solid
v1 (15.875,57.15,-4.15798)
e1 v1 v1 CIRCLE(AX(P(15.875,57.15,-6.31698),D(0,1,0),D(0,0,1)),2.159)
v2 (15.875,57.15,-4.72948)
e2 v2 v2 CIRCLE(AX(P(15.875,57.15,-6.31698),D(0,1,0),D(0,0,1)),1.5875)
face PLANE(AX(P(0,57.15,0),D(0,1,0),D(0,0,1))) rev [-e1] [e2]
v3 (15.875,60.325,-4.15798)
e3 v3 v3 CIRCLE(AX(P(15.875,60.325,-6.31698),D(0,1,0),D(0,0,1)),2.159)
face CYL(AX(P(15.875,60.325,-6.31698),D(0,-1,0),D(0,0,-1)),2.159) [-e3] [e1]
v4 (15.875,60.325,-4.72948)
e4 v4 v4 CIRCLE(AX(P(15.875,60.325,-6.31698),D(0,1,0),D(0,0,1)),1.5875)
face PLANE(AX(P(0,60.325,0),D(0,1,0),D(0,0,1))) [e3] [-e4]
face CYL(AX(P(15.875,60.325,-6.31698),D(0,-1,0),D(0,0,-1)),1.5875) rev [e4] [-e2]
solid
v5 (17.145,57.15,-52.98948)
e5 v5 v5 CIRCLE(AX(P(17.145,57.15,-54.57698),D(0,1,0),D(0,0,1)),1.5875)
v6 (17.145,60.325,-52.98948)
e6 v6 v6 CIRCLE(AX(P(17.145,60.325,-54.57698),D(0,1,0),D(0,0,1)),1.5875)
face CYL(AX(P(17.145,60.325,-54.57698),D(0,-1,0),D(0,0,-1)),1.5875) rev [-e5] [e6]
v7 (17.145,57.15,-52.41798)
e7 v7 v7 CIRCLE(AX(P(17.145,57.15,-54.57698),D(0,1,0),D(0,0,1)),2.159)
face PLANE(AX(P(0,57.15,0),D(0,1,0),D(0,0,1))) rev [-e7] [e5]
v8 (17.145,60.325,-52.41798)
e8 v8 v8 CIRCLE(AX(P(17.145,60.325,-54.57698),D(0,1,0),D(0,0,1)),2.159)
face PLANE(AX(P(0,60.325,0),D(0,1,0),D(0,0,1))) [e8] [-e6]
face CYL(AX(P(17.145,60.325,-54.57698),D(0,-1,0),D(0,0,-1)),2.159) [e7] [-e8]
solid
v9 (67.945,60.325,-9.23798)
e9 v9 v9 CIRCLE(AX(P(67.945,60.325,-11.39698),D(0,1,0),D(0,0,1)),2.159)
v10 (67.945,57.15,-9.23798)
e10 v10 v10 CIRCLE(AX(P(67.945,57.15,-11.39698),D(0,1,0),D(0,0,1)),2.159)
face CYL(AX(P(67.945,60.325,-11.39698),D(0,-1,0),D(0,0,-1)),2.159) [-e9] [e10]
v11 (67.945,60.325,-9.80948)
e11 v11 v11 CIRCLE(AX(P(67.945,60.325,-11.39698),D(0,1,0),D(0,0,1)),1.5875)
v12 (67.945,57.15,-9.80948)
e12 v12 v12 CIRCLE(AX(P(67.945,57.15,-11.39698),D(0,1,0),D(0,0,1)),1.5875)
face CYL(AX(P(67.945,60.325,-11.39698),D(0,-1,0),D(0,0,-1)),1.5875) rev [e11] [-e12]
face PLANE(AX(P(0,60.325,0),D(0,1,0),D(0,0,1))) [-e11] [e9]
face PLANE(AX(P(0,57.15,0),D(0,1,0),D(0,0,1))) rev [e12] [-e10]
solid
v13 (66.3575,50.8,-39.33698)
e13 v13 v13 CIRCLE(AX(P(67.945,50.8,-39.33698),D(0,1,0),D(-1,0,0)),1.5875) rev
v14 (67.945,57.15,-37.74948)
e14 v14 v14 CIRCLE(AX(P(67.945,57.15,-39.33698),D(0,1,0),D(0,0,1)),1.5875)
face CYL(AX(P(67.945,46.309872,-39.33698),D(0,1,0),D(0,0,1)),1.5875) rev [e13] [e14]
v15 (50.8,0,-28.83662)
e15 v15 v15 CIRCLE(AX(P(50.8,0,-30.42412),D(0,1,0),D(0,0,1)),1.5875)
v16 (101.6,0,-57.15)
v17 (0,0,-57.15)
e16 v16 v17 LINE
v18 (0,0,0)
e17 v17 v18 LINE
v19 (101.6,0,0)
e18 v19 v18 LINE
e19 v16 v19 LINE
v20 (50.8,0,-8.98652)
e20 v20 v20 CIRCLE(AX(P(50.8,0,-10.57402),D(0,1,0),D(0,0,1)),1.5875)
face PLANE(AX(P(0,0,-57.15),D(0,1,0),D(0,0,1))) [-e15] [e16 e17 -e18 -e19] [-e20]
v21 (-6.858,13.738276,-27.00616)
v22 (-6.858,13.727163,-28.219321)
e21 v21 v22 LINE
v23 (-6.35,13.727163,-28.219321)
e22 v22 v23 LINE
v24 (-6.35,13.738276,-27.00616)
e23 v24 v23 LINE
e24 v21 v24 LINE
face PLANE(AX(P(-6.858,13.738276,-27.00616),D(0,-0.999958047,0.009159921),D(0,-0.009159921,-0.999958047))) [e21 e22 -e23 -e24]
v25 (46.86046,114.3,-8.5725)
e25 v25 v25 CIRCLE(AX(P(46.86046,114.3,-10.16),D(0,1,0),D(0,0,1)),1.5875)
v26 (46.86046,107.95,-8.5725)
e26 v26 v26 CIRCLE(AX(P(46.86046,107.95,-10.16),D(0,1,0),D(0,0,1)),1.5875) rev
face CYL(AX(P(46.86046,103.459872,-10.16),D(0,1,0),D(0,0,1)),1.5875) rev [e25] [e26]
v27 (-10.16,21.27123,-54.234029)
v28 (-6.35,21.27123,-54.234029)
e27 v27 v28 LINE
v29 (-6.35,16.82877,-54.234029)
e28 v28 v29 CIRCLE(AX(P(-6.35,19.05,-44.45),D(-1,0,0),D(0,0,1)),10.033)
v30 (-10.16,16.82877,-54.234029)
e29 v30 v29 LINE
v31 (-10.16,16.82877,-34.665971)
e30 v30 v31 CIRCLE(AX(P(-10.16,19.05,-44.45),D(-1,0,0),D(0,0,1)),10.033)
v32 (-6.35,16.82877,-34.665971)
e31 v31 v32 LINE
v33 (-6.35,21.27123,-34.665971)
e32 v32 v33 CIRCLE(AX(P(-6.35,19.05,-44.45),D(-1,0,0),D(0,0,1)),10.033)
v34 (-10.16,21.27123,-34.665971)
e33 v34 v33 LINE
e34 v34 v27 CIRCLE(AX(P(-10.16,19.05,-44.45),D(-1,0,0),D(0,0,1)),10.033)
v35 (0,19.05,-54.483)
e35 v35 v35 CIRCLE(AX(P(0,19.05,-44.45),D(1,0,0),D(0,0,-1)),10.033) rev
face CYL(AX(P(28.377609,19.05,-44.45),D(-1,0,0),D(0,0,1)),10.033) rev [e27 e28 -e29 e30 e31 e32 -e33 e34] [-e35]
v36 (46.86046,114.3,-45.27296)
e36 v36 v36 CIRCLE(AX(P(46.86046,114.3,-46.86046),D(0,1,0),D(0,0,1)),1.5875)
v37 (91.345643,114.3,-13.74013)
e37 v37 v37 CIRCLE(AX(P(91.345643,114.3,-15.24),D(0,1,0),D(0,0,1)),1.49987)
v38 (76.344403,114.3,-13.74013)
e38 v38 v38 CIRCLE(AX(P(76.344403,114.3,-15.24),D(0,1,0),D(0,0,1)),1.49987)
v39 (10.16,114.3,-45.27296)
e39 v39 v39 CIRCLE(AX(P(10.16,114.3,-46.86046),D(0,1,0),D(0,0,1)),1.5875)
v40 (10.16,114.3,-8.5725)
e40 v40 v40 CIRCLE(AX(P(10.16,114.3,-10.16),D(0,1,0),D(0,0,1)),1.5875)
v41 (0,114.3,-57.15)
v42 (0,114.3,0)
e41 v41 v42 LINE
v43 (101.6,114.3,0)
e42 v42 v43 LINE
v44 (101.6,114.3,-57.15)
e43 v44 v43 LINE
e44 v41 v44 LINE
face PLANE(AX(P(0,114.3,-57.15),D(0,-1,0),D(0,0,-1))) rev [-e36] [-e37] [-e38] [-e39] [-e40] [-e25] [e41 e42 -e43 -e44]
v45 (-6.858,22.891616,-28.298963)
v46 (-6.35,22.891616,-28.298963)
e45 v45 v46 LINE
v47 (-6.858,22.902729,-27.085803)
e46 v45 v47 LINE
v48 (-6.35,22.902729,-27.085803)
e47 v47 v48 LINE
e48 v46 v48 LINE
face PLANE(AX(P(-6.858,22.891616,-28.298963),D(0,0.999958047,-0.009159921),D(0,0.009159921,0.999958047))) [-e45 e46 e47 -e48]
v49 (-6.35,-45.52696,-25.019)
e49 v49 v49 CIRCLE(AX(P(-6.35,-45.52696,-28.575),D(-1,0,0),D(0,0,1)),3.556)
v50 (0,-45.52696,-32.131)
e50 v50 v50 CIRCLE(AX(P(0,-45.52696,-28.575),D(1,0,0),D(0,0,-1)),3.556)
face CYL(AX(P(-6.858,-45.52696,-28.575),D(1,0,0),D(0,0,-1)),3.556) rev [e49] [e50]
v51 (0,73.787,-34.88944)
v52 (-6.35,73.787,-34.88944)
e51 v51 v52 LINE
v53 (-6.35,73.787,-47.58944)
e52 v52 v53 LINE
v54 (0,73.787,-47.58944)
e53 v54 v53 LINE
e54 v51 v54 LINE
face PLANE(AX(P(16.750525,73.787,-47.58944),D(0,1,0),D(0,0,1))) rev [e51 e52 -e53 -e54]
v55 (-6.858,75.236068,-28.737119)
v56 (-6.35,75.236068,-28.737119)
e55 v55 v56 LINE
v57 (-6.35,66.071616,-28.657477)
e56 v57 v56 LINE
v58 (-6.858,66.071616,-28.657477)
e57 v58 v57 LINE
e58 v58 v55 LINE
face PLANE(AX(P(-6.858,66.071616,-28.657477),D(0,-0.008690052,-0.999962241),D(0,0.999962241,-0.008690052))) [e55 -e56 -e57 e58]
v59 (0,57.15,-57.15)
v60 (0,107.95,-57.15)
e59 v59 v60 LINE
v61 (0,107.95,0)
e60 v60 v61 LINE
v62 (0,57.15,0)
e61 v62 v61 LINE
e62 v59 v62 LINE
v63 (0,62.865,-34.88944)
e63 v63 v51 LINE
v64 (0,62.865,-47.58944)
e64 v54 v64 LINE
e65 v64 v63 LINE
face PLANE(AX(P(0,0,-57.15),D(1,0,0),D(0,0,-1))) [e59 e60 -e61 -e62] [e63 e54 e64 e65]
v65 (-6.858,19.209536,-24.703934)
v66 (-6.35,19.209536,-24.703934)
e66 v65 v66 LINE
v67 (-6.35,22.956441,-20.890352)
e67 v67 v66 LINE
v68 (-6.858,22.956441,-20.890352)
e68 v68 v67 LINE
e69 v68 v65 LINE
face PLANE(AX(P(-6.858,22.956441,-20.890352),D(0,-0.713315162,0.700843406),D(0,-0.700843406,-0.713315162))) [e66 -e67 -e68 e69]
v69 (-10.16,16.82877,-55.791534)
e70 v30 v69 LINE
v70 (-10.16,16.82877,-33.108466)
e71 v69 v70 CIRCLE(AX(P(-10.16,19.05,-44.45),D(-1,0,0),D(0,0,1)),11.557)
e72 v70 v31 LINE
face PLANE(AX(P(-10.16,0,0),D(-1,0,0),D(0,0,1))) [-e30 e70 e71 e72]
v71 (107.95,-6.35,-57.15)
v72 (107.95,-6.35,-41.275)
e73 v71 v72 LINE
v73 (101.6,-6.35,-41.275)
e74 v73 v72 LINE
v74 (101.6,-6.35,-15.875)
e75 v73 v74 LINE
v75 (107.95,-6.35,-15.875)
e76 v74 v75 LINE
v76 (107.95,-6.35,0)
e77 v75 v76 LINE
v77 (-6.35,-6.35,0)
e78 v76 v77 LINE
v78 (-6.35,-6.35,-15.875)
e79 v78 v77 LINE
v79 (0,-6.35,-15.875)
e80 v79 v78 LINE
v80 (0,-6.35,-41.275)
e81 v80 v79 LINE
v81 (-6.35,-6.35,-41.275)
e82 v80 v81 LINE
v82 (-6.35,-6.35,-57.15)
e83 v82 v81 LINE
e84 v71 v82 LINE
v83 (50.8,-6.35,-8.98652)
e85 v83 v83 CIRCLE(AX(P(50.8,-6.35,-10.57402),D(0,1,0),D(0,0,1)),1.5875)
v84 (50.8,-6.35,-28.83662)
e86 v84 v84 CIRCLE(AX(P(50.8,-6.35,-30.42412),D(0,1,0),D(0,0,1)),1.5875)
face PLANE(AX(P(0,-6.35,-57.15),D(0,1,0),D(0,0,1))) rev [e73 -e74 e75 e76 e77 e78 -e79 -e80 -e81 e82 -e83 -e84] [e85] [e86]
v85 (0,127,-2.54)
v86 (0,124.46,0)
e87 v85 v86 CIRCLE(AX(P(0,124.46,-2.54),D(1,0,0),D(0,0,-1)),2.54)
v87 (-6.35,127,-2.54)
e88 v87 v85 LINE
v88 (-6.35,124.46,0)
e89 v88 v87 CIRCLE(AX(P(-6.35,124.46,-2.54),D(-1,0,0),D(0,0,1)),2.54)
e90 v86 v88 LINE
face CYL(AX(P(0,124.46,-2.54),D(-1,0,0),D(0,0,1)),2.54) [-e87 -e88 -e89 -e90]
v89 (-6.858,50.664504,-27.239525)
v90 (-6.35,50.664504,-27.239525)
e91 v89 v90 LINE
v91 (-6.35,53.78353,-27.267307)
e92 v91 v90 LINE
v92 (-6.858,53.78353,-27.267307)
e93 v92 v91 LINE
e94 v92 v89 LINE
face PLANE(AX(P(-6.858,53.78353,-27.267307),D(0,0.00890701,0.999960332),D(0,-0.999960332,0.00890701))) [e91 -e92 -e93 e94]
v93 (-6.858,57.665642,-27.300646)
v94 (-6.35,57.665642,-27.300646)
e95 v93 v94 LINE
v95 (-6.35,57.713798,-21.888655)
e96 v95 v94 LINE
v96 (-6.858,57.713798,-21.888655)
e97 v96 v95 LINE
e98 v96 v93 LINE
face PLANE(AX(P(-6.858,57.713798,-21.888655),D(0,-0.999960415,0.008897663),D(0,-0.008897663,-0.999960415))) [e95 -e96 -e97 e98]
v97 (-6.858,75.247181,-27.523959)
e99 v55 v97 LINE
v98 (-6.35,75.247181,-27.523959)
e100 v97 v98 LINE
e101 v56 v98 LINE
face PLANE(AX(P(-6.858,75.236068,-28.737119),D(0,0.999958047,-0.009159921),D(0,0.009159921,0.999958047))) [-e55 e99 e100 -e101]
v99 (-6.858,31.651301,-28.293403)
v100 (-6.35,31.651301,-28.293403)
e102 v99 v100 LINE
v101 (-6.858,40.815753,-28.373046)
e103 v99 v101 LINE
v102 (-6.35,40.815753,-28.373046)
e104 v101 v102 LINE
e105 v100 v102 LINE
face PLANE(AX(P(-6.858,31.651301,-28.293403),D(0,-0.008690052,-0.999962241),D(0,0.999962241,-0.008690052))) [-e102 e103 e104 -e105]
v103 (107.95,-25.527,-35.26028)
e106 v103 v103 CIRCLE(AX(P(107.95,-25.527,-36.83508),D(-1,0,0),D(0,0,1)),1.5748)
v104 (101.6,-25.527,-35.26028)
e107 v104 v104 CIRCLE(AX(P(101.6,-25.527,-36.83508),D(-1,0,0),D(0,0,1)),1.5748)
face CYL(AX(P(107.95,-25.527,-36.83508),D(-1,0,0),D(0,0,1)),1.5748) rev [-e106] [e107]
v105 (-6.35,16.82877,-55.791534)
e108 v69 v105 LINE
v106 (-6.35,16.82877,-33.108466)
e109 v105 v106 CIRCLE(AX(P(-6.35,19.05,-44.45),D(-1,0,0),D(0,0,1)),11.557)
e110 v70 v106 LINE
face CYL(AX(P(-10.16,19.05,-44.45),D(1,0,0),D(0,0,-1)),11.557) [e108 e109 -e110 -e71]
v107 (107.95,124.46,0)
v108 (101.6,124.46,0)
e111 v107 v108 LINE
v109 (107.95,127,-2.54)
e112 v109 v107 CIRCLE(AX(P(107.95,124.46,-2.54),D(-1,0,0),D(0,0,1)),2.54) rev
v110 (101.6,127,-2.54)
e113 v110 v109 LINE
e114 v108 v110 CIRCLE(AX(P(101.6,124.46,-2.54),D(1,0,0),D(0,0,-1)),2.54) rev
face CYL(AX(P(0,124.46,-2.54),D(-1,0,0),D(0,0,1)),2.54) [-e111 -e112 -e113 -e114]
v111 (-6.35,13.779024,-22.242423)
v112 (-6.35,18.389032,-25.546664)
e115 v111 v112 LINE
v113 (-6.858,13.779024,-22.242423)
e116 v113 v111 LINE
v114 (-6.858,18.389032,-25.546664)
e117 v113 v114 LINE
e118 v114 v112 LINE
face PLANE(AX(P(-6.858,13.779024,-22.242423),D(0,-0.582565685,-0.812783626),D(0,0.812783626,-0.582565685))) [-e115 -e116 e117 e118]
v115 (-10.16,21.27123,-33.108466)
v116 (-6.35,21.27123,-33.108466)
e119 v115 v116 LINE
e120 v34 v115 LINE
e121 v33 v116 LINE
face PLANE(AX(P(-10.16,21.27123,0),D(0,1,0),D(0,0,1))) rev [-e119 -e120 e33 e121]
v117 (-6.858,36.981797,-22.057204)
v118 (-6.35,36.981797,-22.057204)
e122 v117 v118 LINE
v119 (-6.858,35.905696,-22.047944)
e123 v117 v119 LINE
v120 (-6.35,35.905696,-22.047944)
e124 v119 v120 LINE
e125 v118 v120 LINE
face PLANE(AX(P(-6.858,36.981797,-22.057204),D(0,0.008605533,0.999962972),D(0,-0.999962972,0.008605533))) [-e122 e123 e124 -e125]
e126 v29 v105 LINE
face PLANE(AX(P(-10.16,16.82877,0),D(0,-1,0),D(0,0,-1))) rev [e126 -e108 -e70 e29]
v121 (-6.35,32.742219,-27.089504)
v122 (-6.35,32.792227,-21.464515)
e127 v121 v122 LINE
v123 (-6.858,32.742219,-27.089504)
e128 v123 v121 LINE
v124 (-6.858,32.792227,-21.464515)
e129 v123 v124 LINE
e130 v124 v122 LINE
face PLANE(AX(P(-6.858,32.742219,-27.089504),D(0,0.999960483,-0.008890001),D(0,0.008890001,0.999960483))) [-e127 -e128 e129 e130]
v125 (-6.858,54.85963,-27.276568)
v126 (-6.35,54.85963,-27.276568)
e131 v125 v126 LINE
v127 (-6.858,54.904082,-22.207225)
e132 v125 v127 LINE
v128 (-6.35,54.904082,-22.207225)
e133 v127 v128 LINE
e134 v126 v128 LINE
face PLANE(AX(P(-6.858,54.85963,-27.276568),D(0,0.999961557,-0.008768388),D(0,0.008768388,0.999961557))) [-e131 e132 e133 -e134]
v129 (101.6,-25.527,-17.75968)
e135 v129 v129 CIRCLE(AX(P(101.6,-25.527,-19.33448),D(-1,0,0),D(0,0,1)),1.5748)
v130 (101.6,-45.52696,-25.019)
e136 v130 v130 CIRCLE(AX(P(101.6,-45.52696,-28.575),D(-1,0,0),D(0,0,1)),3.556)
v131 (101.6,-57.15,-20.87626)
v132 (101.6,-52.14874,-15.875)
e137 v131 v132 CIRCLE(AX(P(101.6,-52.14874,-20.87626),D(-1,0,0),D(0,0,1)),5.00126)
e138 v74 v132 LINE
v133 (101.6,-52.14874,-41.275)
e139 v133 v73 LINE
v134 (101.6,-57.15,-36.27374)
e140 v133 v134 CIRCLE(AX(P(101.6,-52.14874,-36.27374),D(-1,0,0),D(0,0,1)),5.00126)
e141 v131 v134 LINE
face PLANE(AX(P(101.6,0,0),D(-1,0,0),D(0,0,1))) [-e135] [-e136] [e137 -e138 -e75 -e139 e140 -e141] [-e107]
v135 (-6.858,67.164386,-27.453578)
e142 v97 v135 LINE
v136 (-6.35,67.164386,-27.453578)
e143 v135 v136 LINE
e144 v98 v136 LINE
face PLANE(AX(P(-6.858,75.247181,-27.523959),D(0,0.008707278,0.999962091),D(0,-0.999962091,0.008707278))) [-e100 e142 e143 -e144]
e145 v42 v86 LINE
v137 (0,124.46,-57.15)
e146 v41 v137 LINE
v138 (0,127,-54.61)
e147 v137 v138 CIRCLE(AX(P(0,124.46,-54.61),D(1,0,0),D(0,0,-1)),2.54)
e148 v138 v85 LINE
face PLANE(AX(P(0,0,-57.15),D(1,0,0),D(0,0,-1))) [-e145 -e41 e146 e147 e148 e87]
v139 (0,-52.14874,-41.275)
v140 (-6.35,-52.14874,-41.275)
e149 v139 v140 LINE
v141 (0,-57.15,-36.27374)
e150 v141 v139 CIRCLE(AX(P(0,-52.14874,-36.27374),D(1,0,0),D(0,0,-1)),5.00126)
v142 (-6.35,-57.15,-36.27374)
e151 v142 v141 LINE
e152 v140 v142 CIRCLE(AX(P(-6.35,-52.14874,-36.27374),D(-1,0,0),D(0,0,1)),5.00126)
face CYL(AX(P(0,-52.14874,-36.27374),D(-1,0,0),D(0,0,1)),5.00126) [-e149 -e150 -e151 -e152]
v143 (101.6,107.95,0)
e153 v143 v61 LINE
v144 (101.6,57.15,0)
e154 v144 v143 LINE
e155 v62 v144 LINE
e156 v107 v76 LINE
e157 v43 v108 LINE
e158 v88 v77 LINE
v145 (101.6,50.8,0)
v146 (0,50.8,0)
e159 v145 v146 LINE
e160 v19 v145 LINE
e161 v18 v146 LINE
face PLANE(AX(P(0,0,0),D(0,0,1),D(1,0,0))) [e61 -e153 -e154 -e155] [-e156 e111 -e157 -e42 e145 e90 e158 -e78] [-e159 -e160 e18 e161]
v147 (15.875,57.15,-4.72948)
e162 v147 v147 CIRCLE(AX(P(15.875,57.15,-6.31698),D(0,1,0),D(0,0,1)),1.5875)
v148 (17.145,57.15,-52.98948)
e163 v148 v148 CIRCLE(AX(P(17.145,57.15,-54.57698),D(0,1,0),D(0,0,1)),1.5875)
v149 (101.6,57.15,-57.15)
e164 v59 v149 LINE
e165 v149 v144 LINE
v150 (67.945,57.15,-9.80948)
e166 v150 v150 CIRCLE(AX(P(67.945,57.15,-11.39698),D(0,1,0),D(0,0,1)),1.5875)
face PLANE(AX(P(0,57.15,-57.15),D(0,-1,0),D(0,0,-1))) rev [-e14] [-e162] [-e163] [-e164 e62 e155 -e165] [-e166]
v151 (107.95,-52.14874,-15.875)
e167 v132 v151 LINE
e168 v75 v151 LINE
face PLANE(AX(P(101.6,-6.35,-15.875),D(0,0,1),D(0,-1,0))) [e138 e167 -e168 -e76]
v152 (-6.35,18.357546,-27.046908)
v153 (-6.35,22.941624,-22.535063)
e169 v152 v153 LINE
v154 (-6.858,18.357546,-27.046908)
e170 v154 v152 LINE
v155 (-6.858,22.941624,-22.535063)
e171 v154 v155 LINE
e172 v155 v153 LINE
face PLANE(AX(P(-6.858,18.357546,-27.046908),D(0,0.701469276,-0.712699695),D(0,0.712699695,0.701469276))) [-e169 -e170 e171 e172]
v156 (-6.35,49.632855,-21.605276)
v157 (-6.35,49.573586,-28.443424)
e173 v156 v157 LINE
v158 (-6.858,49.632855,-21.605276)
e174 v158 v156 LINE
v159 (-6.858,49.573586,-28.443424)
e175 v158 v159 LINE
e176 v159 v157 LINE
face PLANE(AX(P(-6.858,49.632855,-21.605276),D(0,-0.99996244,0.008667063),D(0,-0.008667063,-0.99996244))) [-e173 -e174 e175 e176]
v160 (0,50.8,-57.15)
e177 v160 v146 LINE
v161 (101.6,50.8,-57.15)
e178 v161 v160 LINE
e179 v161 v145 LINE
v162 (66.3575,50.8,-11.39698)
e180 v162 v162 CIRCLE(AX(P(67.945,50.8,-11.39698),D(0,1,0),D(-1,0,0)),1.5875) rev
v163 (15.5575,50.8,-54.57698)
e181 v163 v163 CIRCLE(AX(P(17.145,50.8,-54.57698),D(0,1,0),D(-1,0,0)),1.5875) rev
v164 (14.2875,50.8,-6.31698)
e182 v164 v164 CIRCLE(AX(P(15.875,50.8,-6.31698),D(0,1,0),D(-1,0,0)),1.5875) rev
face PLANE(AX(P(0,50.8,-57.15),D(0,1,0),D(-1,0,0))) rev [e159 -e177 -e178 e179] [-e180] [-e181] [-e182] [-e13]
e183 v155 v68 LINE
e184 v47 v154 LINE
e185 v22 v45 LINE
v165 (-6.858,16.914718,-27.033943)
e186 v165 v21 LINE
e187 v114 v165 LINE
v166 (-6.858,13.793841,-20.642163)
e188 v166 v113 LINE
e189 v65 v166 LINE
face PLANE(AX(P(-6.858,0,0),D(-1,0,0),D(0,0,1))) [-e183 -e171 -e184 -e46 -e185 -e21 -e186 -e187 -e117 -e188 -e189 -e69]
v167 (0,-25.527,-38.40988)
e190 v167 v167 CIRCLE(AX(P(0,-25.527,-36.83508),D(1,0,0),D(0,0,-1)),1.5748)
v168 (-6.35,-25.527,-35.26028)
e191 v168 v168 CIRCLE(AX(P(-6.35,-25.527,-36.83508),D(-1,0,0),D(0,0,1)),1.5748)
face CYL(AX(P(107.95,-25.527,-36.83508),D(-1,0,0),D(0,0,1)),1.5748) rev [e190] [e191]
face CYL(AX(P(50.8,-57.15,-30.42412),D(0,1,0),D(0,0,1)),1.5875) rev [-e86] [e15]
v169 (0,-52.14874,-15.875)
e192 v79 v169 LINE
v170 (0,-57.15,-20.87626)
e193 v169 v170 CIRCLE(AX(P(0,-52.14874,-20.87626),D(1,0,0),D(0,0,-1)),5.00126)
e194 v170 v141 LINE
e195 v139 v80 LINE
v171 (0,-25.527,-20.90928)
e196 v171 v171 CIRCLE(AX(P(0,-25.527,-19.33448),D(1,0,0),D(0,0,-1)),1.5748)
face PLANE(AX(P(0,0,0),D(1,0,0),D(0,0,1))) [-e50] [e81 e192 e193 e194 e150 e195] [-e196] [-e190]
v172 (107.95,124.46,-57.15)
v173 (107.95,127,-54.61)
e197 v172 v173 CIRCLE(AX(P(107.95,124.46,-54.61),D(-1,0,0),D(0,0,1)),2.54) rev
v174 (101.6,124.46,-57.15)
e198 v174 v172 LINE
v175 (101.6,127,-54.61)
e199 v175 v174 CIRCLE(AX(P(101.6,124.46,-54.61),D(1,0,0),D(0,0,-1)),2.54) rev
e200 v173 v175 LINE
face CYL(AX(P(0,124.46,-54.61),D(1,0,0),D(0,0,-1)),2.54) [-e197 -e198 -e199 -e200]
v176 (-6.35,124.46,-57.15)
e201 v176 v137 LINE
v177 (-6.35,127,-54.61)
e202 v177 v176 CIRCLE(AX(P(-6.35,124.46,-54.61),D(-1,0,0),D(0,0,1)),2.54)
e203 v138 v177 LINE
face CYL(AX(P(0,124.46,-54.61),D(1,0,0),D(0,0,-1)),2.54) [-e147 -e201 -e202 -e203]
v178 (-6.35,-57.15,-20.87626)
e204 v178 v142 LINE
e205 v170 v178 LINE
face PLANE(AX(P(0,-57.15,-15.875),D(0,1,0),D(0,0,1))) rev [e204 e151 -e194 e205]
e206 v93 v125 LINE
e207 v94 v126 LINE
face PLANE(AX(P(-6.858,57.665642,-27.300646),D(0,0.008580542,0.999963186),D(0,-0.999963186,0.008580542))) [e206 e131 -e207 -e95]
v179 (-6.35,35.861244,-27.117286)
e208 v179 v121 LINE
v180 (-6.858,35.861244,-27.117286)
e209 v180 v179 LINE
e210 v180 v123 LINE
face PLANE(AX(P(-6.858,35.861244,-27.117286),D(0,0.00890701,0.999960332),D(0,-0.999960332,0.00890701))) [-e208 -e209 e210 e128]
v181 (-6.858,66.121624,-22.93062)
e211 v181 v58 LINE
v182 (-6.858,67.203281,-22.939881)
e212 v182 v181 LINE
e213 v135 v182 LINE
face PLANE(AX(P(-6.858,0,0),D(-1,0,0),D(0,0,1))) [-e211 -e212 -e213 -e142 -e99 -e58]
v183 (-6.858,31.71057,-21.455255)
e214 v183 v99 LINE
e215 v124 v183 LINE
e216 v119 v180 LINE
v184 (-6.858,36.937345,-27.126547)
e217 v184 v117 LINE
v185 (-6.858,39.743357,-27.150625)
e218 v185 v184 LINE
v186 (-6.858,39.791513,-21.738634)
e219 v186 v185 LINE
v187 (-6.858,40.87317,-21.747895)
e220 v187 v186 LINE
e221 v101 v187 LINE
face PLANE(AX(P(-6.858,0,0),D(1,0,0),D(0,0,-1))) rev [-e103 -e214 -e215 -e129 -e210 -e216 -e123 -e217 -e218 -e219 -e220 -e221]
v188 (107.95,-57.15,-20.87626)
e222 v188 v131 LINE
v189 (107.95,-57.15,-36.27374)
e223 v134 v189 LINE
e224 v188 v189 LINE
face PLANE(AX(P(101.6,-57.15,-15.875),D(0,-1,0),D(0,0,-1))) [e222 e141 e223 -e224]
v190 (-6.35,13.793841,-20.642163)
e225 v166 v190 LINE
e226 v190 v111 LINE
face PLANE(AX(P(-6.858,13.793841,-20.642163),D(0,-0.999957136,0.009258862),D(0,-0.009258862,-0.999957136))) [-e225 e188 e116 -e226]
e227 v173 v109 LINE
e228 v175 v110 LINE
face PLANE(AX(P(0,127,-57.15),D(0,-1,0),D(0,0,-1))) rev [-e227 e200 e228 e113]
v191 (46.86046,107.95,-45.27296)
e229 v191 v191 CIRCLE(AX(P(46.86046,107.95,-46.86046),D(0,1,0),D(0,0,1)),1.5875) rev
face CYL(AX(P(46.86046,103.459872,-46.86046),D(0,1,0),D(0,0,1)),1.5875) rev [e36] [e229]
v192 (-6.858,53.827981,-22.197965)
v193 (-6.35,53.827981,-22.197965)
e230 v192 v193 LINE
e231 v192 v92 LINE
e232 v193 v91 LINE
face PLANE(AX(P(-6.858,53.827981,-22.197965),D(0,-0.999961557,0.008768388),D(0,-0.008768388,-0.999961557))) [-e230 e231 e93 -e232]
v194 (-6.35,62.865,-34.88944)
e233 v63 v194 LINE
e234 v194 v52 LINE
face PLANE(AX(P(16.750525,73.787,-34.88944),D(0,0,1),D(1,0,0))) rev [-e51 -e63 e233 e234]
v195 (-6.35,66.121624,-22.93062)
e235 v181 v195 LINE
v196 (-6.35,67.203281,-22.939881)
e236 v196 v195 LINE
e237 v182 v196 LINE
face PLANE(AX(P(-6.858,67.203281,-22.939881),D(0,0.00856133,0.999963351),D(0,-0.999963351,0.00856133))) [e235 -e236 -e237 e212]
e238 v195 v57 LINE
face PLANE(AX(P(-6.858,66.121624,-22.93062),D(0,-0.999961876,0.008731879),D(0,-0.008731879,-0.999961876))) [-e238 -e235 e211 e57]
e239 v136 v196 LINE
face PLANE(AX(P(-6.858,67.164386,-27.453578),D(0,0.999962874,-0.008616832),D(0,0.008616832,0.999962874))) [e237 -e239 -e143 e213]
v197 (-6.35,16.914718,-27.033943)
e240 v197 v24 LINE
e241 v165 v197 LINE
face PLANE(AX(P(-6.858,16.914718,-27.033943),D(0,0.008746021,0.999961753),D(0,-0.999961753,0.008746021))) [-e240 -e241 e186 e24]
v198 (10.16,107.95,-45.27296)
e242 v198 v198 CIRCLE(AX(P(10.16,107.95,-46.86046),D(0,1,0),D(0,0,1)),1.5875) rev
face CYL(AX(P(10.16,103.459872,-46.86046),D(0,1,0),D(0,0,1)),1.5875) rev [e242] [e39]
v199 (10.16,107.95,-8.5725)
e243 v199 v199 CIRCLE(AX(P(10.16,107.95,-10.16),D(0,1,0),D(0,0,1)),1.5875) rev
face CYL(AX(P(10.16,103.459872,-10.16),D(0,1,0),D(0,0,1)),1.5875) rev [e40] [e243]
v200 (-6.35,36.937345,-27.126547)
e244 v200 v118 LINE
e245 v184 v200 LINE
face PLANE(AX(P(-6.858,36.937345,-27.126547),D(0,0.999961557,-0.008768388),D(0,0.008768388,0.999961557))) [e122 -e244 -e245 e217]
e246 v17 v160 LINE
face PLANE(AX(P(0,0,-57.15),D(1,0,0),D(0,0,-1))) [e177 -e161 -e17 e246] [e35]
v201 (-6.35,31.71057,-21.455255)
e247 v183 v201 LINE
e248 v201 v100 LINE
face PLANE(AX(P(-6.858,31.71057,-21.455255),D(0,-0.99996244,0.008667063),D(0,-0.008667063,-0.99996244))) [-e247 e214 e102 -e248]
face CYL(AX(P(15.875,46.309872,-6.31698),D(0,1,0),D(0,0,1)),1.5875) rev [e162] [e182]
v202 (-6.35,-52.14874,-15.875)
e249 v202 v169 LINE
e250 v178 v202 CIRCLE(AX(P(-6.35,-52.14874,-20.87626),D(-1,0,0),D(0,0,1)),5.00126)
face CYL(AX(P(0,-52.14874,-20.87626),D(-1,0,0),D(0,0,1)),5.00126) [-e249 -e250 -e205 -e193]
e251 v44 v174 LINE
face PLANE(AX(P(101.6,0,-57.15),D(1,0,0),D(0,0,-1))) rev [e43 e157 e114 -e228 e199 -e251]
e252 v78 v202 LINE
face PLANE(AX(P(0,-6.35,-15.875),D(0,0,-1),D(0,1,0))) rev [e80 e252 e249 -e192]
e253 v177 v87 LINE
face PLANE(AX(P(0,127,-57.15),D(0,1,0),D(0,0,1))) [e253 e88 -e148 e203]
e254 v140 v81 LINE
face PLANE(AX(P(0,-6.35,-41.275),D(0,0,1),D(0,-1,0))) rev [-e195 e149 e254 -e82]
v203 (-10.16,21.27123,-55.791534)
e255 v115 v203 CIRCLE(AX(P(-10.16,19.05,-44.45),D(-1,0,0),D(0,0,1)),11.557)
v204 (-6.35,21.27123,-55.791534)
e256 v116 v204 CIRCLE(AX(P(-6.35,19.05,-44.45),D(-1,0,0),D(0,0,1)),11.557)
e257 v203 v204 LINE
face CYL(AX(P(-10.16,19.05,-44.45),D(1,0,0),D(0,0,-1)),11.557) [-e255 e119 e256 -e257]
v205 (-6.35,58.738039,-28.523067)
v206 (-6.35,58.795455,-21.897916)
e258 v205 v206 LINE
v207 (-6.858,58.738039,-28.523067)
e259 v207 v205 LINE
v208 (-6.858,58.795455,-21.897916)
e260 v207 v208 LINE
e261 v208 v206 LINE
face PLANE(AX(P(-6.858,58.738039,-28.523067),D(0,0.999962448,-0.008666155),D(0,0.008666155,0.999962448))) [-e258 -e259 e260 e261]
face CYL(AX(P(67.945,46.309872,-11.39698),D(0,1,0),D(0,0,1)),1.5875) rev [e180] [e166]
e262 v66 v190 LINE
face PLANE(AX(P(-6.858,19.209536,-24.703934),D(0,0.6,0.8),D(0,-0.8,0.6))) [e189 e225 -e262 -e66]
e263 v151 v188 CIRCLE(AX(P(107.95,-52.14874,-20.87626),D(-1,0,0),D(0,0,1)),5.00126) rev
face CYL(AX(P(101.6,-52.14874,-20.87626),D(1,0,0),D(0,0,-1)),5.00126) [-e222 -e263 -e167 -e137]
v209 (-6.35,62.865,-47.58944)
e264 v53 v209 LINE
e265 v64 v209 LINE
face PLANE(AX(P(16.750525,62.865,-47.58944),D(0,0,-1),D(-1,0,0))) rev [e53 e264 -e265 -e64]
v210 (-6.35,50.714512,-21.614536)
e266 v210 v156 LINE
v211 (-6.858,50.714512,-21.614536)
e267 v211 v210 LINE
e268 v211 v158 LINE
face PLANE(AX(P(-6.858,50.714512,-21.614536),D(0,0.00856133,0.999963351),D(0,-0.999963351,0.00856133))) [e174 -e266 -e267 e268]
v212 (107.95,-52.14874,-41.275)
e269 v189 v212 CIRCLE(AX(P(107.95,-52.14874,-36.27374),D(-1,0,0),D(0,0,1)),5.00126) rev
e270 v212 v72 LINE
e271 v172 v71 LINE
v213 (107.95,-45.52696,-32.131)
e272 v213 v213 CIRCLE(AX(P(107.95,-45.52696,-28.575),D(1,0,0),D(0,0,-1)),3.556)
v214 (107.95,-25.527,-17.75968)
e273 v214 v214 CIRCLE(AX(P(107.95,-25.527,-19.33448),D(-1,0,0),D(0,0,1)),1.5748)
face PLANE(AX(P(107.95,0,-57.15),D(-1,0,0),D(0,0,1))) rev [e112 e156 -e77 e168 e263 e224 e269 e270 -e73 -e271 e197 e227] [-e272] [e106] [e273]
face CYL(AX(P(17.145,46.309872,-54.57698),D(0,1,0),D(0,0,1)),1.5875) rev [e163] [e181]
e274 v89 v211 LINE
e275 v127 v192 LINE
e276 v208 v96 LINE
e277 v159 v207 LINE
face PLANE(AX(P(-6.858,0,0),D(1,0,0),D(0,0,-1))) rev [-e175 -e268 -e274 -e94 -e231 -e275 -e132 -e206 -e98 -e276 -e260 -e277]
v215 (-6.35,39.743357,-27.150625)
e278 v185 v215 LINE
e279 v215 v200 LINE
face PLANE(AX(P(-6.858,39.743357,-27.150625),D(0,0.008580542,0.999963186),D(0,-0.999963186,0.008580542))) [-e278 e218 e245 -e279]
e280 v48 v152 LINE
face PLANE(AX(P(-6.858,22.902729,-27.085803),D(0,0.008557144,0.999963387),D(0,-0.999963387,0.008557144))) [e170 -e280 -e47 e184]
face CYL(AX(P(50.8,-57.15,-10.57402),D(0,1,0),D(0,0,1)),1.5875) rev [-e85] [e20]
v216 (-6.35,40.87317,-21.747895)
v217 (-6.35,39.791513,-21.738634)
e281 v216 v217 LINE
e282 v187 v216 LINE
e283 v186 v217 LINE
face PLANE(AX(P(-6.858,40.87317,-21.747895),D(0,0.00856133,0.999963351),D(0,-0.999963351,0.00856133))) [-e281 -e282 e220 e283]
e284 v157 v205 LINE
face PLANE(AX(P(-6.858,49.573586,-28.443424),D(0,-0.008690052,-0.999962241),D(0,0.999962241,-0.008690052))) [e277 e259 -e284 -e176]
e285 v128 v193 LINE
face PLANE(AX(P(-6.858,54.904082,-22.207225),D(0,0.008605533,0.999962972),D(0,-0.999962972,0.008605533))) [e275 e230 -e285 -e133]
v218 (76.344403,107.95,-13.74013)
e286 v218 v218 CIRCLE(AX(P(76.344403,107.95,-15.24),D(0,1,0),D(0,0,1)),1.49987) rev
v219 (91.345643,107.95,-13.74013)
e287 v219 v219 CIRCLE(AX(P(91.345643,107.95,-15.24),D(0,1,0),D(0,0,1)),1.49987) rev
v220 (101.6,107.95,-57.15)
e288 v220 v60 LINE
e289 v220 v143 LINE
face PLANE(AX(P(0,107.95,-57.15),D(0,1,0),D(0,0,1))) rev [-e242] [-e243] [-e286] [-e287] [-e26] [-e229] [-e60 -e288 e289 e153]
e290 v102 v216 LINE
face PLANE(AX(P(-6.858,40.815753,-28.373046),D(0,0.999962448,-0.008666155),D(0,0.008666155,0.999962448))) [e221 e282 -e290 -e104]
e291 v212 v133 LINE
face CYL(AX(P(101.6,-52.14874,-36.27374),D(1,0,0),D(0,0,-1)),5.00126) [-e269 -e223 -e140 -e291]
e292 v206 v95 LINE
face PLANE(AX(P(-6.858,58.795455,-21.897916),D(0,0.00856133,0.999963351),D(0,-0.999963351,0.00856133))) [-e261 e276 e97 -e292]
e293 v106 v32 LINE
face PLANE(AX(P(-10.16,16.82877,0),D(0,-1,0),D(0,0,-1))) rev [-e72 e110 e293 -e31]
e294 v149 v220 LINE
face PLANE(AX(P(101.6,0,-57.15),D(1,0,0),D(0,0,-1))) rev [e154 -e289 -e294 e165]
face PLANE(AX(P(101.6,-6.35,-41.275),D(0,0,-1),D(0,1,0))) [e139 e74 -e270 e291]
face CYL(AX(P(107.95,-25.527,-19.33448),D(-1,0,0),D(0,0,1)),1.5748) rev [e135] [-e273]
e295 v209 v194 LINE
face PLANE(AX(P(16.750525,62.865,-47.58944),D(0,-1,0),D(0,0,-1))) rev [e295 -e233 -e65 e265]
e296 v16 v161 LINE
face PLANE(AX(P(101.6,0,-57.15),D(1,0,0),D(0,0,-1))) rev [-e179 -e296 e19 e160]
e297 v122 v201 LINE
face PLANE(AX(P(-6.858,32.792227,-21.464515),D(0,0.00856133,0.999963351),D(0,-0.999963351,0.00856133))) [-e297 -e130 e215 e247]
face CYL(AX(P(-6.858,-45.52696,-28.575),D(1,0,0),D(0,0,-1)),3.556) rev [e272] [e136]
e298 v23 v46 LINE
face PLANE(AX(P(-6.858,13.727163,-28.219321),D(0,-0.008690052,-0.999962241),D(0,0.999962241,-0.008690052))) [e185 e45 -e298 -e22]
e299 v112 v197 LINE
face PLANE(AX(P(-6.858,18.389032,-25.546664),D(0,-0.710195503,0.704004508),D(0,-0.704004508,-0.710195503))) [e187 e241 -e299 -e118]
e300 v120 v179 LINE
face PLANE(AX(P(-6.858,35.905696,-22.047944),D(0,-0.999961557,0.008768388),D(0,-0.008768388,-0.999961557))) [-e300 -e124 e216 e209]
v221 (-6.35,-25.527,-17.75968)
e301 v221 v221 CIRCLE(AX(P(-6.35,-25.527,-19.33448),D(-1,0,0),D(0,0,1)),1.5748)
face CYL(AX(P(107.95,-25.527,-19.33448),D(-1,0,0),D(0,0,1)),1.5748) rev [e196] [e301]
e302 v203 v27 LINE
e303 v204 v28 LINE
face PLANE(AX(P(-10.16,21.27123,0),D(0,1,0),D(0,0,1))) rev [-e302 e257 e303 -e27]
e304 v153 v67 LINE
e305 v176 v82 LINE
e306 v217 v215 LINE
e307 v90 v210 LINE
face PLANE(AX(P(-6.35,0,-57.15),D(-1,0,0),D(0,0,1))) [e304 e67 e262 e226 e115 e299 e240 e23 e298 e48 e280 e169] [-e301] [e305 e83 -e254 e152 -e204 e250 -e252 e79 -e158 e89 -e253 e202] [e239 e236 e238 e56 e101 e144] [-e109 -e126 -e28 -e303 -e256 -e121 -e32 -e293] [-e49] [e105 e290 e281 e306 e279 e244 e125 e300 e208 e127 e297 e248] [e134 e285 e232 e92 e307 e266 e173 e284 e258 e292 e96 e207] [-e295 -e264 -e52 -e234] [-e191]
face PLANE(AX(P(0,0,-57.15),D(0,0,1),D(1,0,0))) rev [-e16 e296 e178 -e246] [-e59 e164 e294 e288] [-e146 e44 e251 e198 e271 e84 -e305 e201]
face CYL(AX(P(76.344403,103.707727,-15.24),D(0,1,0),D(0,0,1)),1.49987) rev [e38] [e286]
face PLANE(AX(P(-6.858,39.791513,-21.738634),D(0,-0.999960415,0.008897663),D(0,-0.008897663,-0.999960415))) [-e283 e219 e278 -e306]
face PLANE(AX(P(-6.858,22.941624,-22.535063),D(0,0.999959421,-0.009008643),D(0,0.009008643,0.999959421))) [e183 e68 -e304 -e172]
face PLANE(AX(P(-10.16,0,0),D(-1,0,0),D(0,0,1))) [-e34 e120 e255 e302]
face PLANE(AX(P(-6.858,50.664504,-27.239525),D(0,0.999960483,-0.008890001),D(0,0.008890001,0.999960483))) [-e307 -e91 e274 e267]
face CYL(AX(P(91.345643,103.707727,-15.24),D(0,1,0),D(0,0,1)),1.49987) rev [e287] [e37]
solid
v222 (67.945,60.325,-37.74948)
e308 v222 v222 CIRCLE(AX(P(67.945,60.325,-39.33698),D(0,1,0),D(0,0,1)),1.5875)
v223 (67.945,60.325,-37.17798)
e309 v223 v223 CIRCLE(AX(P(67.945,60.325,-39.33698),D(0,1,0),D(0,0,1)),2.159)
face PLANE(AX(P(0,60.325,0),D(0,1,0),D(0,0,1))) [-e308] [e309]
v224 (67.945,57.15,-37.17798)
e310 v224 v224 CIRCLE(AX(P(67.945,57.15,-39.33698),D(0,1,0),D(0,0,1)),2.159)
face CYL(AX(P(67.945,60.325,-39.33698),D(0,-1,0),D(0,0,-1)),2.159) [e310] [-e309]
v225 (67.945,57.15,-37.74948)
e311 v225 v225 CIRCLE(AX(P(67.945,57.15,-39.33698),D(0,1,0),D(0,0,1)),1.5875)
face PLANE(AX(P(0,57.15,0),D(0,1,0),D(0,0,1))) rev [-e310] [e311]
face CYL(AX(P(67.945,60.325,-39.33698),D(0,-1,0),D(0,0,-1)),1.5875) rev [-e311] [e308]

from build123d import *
from build123d.topology import SkipClean

# Parameters (mm, degrees)
SKETCH1_W                = 6.35
SKETCH1_H                = 127
SKETCH1_W_2              = 101.6
SKETCH1_H_2              = 6.35
BOSS_EXTRUDE1_DEPTH      = 57.15
SKETCH2_W                = 25.4
SKETCH2_H                = 50.8
BOSS_EXTRUDE2_DEPTH      = 6.35
BOSS_EXTRUDE3_DEPTH      = 0.508
FILLET1_R                = 5.00126
CUT_EXTRUDE8_DEPTH       = 181.488225001
SKETCH7_R                = 1.5748
CUT_EXTRUDE2_DEPTH       = 181.165514181
CUT_EXTRUDE3_DEPTH       = 6.35
BOSS_EXTRUDE6_START      = 3.81
BOSS_EXTRUDE6_DEPTH      = 3.81
SKETCH10_R               = 1.5875
CUT_EXTRUDE5_DEPTH       = 6.35
SKETCH11_R               = 1.5875
CUT_EXTRUDE6_DEPTH       = 6.35
SKETCH12_R               = 1.49987
CUT_EXTRUDE7_DEPTH       = 6.35
SKETCH9_W                = 12.7
SKETCH9_H                = 10.922
CUT_EXTRUDE4_DEPTH       = 6.35
SKETCH10_5_R             = 2.159
SKETCH10_5_R_2           = 1.5875
BOSS_EXTRUDE9_DEPTH      = 3.175
BOSS_EXTRUDE9_2_DEPTH    = 3.175
BOSS_EXTRUDE9_3_DEPTH    = 3.175
BOSS_EXTRUDE9_4_DEPTH    = 3.175
CUT_EXTRUDE9_START       = -6.35
CUT_EXTRUDE9_DEPTH       = 114.3
CUT_EXTRUDE9_2_OUTLINE_R = 1.5875
CUT_EXTRUDE9_2_DEPTH     = 6.35


# Read off the part's stored shape, not the designer's step: Cut-Extrude9
with BuildPart() as part:
    # Sketch1 → Boss-Extrude1 (new body)
    with BuildSketch(Plane.XY):
        with Locations((104.775, 63.5)):
            Rectangle(SKETCH1_W, SKETCH1_H)
        with Locations((-3.175, 63.5)):
            Rectangle(SKETCH1_W, SKETCH1_H)
        with Locations((50.8, 111.125)):
            Rectangle(SKETCH1_W_2, SKETCH1_H_2)
        with Locations((50.8, 53.975)):
            Rectangle(SKETCH1_W_2, SKETCH1_H_2)
        Polygon((107.95, -6.35), (101.6, -6.35), (0, -6.35), (-6.35, -6.35), (-6.35, 0), (0, 0), (101.6, 0), (107.95, 0), align=None)
    extrude(amount=-BOSS_EXTRUDE1_DEPTH)

    # Sketch2 → Boss-Extrude2 (add)
    with BuildSketch(Plane(origin=(107.95, 0, 0), x_dir=(0, 0, -1), z_dir=(1, 0, 0))):
        with Locations((28.575, -31.75)):
            Rectangle(SKETCH2_W, SKETCH2_H)
    boss_extrude2 = extrude(amount=-BOSS_EXTRUDE2_DEPTH)

    # Mirror1: Boss-Extrude2 across plane
    add(boss_extrude2.mirror(Plane(origin=(50.8, 0, 0), x_dir=(0, 0, 1), z_dir=(1, 0, 0))))

    # Sketch4 → Boss-Extrude3 (add)
    with BuildSketch(Plane.ZY.offset(6.35)):
        Polygon((-28.657476896, 66.071615527), (-28.737119471, 75.236068065), (-27.523959323, 75.247180983), (-27.453577513, 67.164385737), (-22.939880901, 67.203280948), (-22.930620136, 66.121623655), align=None)
        Polygon((-28.44342412, 49.573585988), (-28.523066695, 58.738038526), (-21.897915779, 58.795455265), (-21.888655015, 57.713797973), (-27.300645782, 57.665641998), (-27.276567795, 54.859630358), (-22.207225313, 54.904082027), (-22.197964549, 53.827981194), (-27.26730703, 53.783529524), (-27.239524737, 50.664504044), (-21.614536386, 50.714512173), (-21.605275622, 49.63285488), align=None)
        Polygon((-28.29340319, 31.651300701), (-28.373045764, 40.815753239), (-21.747894849, 40.873169979), (-21.738634085, 39.791512686), (-27.150624852, 39.743356711), (-27.126546864, 36.937345071), (-22.057204383, 36.981796741), (-22.047943619, 35.905695907), (-27.1172861, 35.861244237), (-27.089503806, 32.742218758), (-21.464515456, 32.792226886), (-21.455254691, 31.710569593), align=None)
        Polygon((-28.219320528, 13.727163261), (-28.298963103, 22.891615799), (-27.085802955, 22.902728717), (-27.046907744, 18.357545506), (-22.535063285, 22.941623927), (-20.890351512, 22.956441151), (-24.703934328, 19.209535839), (-20.642163024, 13.793840765), (-22.242423127, 13.779023542), (-25.546663897, 18.389032105), (-27.033942674, 16.914718398), (-27.00616038, 13.738276179), align=None)
    extrude(amount=BOSS_EXTRUDE3_DEPTH)

    # Fillet1
    fillet1_edges = [part.edges().sort_by_distance(p)[0] for p in [
        (104.775, -57.15, -41.275),
        (104.775, -57.15, -15.875),
        (-3.175, -57.15, -15.875),
        (-3.175, -57.15, -41.275),
    ]]
    fillet(fillet1_edges, radius=FILLET1_R)

    # Sketch5 → Cut-Extrude8 (cut, through all)
    with BuildSketch(Plane(origin=(107.95, 0, 0), x_dir=(0, 0, -1), z_dir=(1, 0, 0))):
        with BuildLine():
            ThreePointArc((25.019, -45.52696), (25.614159021, -44.090119021), (27.051, -43.49496))
            Line((27.051, -43.49496), (30.099, -43.49496))
            ThreePointArc((30.099, -43.49496), (31.535840979, -44.090119021), (32.131, -45.52696))
            ThreePointArc((32.131, -45.52696), (28.575, -41.97096), (25.019, -45.52696))
        make_face()
        with BuildLine():
            ThreePointArc((30.099, -47.55896), (32.131, -45.52696), (30.099, -43.49496))
            Line((30.099, -43.49496), (27.051, -43.49496))
            ThreePointArc((27.051, -43.49496), (25.019, -45.52696), (27.051, -47.55896))
            Line((27.051, -47.55896), (30.099, -47.55896))
        make_face()
        with BuildLine():
            ThreePointArc((27.051, -47.55896), (25.614159021, -46.963800979), (25.019, -45.52696))
            ThreePointArc((25.019, -45.52696), (28.575, -49.08296), (32.131, -45.52696))
            ThreePointArc((32.131, -45.52696), (31.535840979, -46.963800979), (30.099, -47.55896))
            Line((30.099, -47.55896), (27.051, -47.55896))
        make_face()
    extrude(amount=-CUT_EXTRUDE8_DEPTH, mode=Mode.SUBTRACT)

    # Sketch7 → Cut-Extrude2 (cut, through all)
    with BuildSketch(Plane.ZY.offset(6.35)):
        with Locations((-36.83508, -25.527)):
            Circle(SKETCH7_R)
        with Locations((-19.33448, -25.527)):
            Circle(SKETCH7_R)
    extrude(amount=-CUT_EXTRUDE2_DEPTH, mode=Mode.SUBTRACT)

    # Sketch8 → Cut-Extrude3 (cut)
    with BuildSketch(Plane.ZY.offset(6.35)):
        with BuildLine():
            ThreePointArc((-34.665970856, 21.27123), (-44.45, 29.083), (-54.234029144, 21.27123))
            Line((-54.234029144, 21.27123), (-34.665970856, 21.27123))
        make_face()
        with BuildLine():
            Line((-34.665970856, 21.27123), (-54.234029144, 21.27123))
            ThreePointArc((-54.234029144, 21.27123), (-54.483, 19.05), (-54.234029144, 16.82877))
            Line((-54.234029144, 16.82877), (-34.665970856, 16.82877))
            ThreePointArc((-34.665970856, 16.82877), (-34.479436992, 17.932430181), (-34.417, 19.05))
            ThreePointArc((-34.417, 19.05), (-34.479436992, 20.167569819), (-34.665970856, 21.27123))
        make_face()
        with BuildLine():
            Line((-34.665970856, 16.82877), (-54.234029144, 16.82877))
            ThreePointArc((-54.234029144, 16.82877), (-44.45, 9.017), (-34.665970856, 16.82877))
        make_face()
    extrude(amount=-CUT_EXTRUDE3_DEPTH, mode=Mode.SUBTRACT)

    # Sketch8<3> → Boss-Extrude6 (add)
    with SkipClean():  # the faces are left unmerged after this step: merging them gives an invalid solid
        with BuildSketch(Plane.ZY.offset(6.35).offset(BOSS_EXTRUDE6_START)):
            with BuildLine():
                ThreePointArc((-33.108466317, 21.27123), (-44.45, 30.607), (-55.791533683, 21.27123))
                Line((-55.791533683, 21.27123), (-54.234029144, 21.27123))
                ThreePointArc((-54.234029144, 21.27123), (-44.45, 29.083), (-34.665970856, 21.27123))
                Line((-34.665970856, 21.27123), (-33.108466317, 21.27123))
            make_face()
            with BuildLine():
                Line((-54.234029144, 16.82877), (-55.791533683, 16.82877))
                ThreePointArc((-55.791533683, 16.82877), (-44.45, 7.493), (-33.108466317, 16.82877))
                Line((-33.108466317, 16.82877), (-34.665970856, 16.82877))
                ThreePointArc((-34.665970856, 16.82877), (-44.45, 9.017), (-54.234029144, 16.82877))
            make_face()
        extrude(amount=-BOSS_EXTRUDE6_DEPTH)

    # Sketch10 → Cut-Extrude5 (cut)
    with SkipClean():  # the faces are left unmerged after this step: merging them gives an invalid solid
        with BuildSketch(Plane(origin=(0, 57.15, 0), x_dir=(1, 0, 0), z_dir=(0, 1, 0))):
            with Locations(Location((15.875, 6.31698, 0), (0, 0, 270))):
                Circle(SKETCH10_R)
            with Locations(Location((67.945, 11.39698, 0), (0, 0, 270))):
                Circle(SKETCH10_R)
            with Locations(Location((67.945, 39.33698, 0), (0, 0, 270))):
                Circle(SKETCH10_R)
            with Locations(Location((17.145, 54.57698, 0), (0, 0, 270))):
                Circle(SKETCH10_R)
        extrude(amount=-CUT_EXTRUDE5_DEPTH, mode=Mode.SUBTRACT)

    # Sketch11 → Cut-Extrude6 (cut)
    with SkipClean():  # the faces are left unmerged after this step: merging them gives an invalid solid
        with BuildSketch(Plane(origin=(0, 114.3, 0), x_dir=(1, 0, 0), z_dir=(0, 1, 0))):
            with Locations(Location((10.16, 10.16, 0), (0, 0, 270))):
                Circle(SKETCH11_R)
            with Locations(Location((46.86046, 10.16, 0), (0, 0, 270))):
                Circle(SKETCH11_R)
            with Locations(Location((46.86046, 46.86046, 0), (0, 0, 270))):
                Circle(SKETCH11_R)
            with Locations(Location((10.16, 46.86046, 0), (0, 0, 270))):
                Circle(SKETCH11_R)
        extrude(amount=-CUT_EXTRUDE6_DEPTH, mode=Mode.SUBTRACT)

    # Sketch12 → Cut-Extrude7 (cut)
    with SkipClean():  # the faces are left unmerged after this step: merging them gives an invalid solid
        with BuildSketch(Plane(origin=(0, 114.3, 0), x_dir=(1, 0, 0), z_dir=(0, 1, 0))):
            with Locations(Location((91.345643218, 15.24, 0), (0, 0, 270))):
                Circle(SKETCH12_R)
            with Locations(Location((76.344403218, 15.24, 0), (0, 0, 270))):
                Circle(SKETCH12_R)
        extrude(amount=-CUT_EXTRUDE7_DEPTH, mode=Mode.SUBTRACT)

    # Sketch9 → Cut-Extrude4 (cut)
    with SkipClean():  # the faces are left unmerged after this step: merging them gives an invalid solid
        with BuildSketch(Plane.ZY.offset(6.35)):
            with Locations((-41.23944, 68.326)):
                Rectangle(SKETCH9_W, SKETCH9_H)
        extrude(amount=-CUT_EXTRUDE4_DEPTH, mode=Mode.SUBTRACT)

    # Cut-Extrude9 outline → Cut-Extrude9 (cut)
    with SkipClean():  # the faces are left unmerged after this step: merging them gives an invalid solid
        with BuildSketch(Plane.YZ.offset(CUT_EXTRUDE9_START)):
            with BuildLine():
                ThreePointArc((124.46, 0), (126.256051224, -0.743948776), (127, -2.54))
                Line((127, -2.54), (127, 0))
                Line((127, 0), (124.46, 0))
            make_face()
            with BuildLine():
                ThreePointArc((127, -54.61), (126.256051224, -56.406051224), (124.46, -57.15))
                Line((124.46, -57.15), (127, -57.15))
                Line((127, -57.15), (127, -54.61))
            make_face()
        extrude(amount=CUT_EXTRUDE9_DEPTH, mode=Mode.SUBTRACT)

    # Cut-Extrude9 2 outline → Cut-Extrude9 2 (cut)
    with SkipClean():  # the faces are left unmerged after this step: merging them gives an invalid solid
        with BuildSketch(Plane(origin=(0, 0, 0), x_dir=(1, 0, 0), z_dir=(0, 1, 0)).offset(CUT_EXTRUDE9_START)):
            with Locations((50.8, 30.42412)):
                Circle(CUT_EXTRUDE9_2_OUTLINE_R)
            with Locations((50.8, 10.57402)):
                Circle(CUT_EXTRUDE9_2_OUTLINE_R)
        extrude(amount=CUT_EXTRUDE9_2_DEPTH, mode=Mode.SUBTRACT)


with BuildPart() as body_2:
    # Sketch10<5> → Boss-Extrude9 (new body)
    with BuildSketch(Plane(origin=(0, 57.15, 0), x_dir=(1, 0, 0), z_dir=(0, 1, 0))):
        with Locations(Location((15.875, 6.31698, 0), (0, 0, 270))):
            Circle(SKETCH10_5_R)
        with Locations(Location((15.875, 6.31698, 0), (0, 0, 270))):
            Circle(SKETCH10_5_R_2, mode=Mode.SUBTRACT)
    extrude(amount=BOSS_EXTRUDE9_DEPTH)


with BuildPart() as body_3:
    # Sketch10<5> → Boss-Extrude9 2 (new body)
    with BuildSketch(Plane(origin=(0, 57.15, 0), x_dir=(1, 0, 0), z_dir=(0, 1, 0))):
        with Locations(Location((67.945, 11.39698, 0), (0, 0, 270))):
            Circle(SKETCH10_5_R)
        with Locations(Location((67.945, 11.39698, 0), (0, 0, 270))):
            Circle(SKETCH10_5_R_2, mode=Mode.SUBTRACT)
    extrude(amount=BOSS_EXTRUDE9_2_DEPTH)


with BuildPart() as body_4:
    # Sketch10<5> → Boss-Extrude9 3 (new body)
    with BuildSketch(Plane(origin=(0, 57.15, 0), x_dir=(1, 0, 0), z_dir=(0, 1, 0))):
        with Locations(Location((67.945, 39.33698, 0), (0, 0, 270))):
            Circle(SKETCH10_5_R)
        with Locations(Location((67.945, 39.33698, 0), (0, 0, 270))):
            Circle(SKETCH10_5_R_2, mode=Mode.SUBTRACT)
    extrude(amount=BOSS_EXTRUDE9_3_DEPTH)


with BuildPart() as body_5:
    # Sketch10<5> → Boss-Extrude9 4 (new body)
    with BuildSketch(Plane(origin=(0, 57.15, 0), x_dir=(1, 0, 0), z_dir=(0, 1, 0))):
        with Locations(Location((17.145, 54.57698, 0), (0, 0, 270))):
            Circle(SKETCH10_5_R)
        with Locations(Location((17.145, 54.57698, 0), (0, 0, 270))):
            Circle(SKETCH10_5_R_2, mode=Mode.SUBTRACT)
    extrude(amount=BOSS_EXTRUDE9_4_DEPTH)


solid = Compound([part.part, body_2.part, body_3.part, body_4.part, body_5.part])
